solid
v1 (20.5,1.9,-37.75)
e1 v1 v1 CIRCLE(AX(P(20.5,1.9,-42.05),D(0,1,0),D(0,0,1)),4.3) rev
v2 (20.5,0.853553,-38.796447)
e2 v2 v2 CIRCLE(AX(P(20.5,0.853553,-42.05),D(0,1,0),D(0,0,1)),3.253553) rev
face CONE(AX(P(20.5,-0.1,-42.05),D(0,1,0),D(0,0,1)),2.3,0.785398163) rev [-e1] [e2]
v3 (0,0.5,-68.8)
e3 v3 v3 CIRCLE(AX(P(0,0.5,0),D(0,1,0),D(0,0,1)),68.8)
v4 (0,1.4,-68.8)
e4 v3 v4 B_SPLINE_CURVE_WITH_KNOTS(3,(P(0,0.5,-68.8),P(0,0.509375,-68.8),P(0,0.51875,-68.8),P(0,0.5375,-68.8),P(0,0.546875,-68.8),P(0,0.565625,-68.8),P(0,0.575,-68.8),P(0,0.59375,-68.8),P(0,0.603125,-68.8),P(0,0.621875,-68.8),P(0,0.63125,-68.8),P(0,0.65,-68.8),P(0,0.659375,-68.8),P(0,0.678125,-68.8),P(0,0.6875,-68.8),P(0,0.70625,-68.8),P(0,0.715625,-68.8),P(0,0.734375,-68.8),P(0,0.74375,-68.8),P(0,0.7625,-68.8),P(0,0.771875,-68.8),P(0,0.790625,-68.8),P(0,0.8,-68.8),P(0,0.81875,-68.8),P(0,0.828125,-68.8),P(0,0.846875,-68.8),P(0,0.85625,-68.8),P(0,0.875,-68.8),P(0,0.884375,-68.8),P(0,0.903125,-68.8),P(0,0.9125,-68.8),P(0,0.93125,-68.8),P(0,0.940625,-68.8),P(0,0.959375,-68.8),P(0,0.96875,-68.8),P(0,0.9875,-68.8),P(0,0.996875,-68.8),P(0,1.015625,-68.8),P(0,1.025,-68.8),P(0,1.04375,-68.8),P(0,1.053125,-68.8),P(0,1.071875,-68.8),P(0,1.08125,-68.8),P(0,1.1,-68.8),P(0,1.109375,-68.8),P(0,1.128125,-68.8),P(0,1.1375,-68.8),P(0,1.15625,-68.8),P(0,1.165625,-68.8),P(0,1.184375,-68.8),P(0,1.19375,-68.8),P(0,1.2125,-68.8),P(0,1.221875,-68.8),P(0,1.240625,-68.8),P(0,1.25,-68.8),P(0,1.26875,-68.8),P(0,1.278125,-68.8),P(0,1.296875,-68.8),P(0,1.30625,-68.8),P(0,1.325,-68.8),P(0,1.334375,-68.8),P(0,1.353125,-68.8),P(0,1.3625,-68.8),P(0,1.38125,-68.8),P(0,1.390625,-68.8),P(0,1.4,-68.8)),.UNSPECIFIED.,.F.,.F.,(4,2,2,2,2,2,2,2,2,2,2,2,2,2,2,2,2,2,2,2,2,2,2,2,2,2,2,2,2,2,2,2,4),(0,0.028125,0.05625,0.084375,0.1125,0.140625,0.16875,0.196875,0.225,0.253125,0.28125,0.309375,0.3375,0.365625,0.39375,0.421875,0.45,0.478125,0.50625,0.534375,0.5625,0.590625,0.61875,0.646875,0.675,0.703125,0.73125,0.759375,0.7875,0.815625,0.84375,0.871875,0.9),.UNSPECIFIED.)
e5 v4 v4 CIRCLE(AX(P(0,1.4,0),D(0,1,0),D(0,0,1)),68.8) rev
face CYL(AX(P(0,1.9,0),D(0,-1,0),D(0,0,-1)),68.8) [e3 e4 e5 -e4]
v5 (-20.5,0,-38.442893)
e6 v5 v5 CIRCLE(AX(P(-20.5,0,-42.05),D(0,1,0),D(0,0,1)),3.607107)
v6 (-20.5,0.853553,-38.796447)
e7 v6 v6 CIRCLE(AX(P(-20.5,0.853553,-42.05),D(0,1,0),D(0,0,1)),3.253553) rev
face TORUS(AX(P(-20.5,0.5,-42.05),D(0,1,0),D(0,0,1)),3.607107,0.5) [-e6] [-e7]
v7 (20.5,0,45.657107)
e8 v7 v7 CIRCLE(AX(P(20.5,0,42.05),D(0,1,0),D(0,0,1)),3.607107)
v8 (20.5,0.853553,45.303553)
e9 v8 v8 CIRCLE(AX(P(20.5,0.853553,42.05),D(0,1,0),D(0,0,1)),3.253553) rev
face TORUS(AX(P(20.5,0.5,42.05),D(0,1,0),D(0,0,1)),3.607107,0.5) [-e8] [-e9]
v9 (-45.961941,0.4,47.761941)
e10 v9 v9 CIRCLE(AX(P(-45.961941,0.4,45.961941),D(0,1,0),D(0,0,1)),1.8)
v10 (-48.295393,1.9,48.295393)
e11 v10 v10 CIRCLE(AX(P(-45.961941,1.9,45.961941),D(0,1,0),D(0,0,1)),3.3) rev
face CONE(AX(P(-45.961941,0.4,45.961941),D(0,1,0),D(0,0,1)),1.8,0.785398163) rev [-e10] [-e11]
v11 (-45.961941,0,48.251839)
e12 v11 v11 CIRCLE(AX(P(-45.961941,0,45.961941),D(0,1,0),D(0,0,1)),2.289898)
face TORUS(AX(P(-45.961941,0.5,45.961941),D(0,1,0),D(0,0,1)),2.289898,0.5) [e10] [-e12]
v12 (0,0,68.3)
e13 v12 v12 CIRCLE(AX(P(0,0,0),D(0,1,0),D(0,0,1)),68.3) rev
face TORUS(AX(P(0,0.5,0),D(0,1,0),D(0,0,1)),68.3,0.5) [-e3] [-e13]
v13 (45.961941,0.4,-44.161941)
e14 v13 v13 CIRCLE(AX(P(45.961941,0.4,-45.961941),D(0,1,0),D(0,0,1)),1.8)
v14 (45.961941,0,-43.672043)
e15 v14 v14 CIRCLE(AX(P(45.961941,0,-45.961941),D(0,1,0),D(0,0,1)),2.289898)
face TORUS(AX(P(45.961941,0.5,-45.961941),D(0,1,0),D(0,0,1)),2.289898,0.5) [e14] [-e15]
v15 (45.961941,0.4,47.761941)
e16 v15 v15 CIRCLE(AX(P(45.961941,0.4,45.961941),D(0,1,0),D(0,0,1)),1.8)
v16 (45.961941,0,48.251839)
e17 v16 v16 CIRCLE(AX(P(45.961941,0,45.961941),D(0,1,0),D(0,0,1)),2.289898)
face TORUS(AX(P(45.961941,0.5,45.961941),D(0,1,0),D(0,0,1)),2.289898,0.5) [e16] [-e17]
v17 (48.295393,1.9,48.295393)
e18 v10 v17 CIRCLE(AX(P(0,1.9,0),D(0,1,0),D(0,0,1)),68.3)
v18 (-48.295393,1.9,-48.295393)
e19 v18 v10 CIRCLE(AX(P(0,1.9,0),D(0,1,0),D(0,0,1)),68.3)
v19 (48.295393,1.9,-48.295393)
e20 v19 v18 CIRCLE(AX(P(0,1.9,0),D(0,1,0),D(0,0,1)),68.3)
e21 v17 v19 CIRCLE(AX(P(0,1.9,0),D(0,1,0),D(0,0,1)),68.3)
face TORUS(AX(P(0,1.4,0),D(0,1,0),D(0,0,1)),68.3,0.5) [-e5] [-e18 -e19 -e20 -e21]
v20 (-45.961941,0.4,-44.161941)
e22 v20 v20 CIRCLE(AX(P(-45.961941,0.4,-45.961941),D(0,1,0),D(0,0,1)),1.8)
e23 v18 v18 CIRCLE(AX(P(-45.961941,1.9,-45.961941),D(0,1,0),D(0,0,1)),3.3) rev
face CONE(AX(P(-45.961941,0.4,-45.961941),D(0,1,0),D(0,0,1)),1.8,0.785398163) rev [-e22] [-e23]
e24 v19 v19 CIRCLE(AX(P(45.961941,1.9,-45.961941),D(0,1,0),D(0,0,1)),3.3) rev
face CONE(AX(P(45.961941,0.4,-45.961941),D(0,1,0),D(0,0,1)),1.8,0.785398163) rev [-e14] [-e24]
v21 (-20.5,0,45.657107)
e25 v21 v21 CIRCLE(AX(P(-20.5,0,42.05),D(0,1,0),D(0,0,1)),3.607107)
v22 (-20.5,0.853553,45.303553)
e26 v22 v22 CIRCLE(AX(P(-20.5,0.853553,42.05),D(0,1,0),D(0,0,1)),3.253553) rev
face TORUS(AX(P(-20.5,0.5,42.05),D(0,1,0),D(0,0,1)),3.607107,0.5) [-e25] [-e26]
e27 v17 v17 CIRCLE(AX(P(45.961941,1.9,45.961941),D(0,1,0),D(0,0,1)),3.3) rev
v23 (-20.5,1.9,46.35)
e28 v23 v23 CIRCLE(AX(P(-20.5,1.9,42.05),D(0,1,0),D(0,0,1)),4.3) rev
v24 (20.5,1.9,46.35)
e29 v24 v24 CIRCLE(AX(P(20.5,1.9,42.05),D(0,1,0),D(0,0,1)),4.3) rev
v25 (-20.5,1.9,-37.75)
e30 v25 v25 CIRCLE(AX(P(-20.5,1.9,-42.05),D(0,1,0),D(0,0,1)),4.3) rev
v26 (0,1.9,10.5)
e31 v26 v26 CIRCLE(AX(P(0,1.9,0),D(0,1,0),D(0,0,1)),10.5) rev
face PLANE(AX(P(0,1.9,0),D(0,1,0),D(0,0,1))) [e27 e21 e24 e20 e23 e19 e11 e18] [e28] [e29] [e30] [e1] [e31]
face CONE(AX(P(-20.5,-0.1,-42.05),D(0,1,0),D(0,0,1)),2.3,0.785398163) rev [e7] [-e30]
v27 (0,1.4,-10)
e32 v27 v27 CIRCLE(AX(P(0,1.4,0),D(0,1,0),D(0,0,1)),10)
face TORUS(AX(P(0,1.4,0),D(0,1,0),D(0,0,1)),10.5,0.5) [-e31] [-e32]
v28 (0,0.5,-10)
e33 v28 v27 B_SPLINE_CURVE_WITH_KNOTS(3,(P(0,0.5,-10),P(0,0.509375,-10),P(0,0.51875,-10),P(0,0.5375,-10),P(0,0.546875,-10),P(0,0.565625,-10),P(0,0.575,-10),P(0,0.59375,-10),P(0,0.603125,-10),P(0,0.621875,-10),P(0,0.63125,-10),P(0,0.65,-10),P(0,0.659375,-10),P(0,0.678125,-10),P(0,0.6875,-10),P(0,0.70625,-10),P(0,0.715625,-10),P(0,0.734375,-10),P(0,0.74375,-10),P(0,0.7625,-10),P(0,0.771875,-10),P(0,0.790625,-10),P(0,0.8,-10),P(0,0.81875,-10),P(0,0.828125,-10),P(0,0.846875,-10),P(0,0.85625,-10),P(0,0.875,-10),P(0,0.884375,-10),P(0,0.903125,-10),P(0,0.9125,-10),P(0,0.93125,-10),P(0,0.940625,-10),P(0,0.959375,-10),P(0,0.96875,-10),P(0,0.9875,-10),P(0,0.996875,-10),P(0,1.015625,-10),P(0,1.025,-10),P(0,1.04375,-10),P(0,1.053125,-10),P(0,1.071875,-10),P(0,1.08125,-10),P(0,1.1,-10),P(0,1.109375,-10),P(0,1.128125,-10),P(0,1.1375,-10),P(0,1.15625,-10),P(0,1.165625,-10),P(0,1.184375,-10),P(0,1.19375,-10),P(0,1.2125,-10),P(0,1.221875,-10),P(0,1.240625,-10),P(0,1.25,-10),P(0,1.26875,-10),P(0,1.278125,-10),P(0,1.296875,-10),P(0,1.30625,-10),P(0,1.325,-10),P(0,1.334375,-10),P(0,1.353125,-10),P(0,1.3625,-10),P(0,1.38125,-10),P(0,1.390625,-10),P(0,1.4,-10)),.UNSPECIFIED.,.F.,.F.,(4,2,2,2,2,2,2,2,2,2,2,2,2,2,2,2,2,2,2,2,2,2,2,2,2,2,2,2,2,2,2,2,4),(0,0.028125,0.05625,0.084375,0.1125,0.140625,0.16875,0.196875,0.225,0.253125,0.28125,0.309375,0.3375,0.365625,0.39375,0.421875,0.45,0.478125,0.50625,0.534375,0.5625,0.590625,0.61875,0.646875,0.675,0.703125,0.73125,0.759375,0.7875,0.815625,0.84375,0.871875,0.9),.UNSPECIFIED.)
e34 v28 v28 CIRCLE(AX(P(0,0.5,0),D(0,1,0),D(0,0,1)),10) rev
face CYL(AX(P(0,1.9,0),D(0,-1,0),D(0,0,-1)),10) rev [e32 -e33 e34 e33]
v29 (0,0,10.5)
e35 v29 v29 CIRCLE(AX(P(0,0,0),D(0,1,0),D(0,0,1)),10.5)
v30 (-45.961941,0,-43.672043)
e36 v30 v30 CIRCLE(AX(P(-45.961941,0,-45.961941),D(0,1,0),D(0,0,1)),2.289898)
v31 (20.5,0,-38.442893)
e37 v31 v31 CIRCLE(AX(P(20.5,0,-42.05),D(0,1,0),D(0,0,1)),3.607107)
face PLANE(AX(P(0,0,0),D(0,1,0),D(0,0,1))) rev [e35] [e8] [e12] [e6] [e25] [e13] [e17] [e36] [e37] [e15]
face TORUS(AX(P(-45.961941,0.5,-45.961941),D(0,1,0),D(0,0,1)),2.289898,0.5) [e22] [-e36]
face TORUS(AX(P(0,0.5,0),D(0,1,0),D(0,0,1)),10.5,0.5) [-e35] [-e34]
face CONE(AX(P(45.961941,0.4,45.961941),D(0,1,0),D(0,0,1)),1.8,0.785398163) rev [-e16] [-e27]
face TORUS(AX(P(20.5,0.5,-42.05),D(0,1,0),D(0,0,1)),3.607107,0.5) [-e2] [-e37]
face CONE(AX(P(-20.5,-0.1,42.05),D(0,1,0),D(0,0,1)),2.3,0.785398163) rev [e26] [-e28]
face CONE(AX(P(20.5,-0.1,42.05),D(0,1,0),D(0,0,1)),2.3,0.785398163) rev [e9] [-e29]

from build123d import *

# Parameters (mm, degrees)
SKETCH1_R           = 68.8
SKETCH1_R_2         = 2.3
SKETCH1_R_3         = 10
SKETCH1_R_4         = 1.8
BOSS_EXTRUDE1_DEPTH = 1.9
CHAMFER1_SIZE       = 2
CHAMFER3_SIZE       = 1.5
FILLET2_R           = 0.5


with BuildPart() as part:
    # Sketch1 → Boss-Extrude1 (new body)
    with BuildSketch(Plane(origin=(0, 0, 0), x_dir=(1, 0, 0), z_dir=(0, 1, 0))):
        with Locations(Location((0, 0, 0), (0, 0, 90))):
            Circle(SKETCH1_R)
        with Locations(Location((-20.5, 42.05, 0), (0, 0, 90))):
            Circle(SKETCH1_R_2, mode=Mode.SUBTRACT)
        with Locations(Location((20.5, 42.05, 0), (0, 0, 90))):
            Circle(SKETCH1_R_2, mode=Mode.SUBTRACT)
        with Locations(Location((20.5, -42.05, 0), (0, 0, 90))):
            Circle(SKETCH1_R_2, mode=Mode.SUBTRACT)
        with Locations(Location((-20.5, -42.05, 0), (0, 0, 90))):
            Circle(SKETCH1_R_2, mode=Mode.SUBTRACT)
        with Locations(Location((0, 0, 0), (0, 0, 90))):
            Circle(SKETCH1_R_3, mode=Mode.SUBTRACT)
        with Locations(Location((-45.961940777, 45.961940777, 0), (0, 0, 90))):
            Circle(SKETCH1_R_4, mode=Mode.SUBTRACT)
        with Locations(Location((45.961940777, 45.961940777, 0), (0, 0, 90))):
            Circle(SKETCH1_R_4, mode=Mode.SUBTRACT)
        with Locations(Location((45.961940777, -45.961940777, 0), (0, 0, 90))):
            Circle(SKETCH1_R_4, mode=Mode.SUBTRACT)
        with Locations(Location((-45.961940777, -45.961940777, 0), (0, 0, 90))):
            Circle(SKETCH1_R_4, mode=Mode.SUBTRACT)
    extrude(amount=BOSS_EXTRUDE1_DEPTH)

    # Chamfer1
    # the kernel refuses this chamfer: 2 mm, written as the material it takes off along each edge
    with BuildSketch(Plane(origin=(-20.5, 1.9, -42.05), x_dir=(0, 0, -1), z_dir=(1, 0, 0))) as chamfer1_piece_1:
        Polygon((2.3, -CHAMFER1_SIZE), (2.3 + CHAMFER1_SIZE, 0), (2.3, 0), align=None)
    revolve(axis=Axis((-20.5, 1.9, -42.05), (0, 1, 0)), mode=Mode.SUBTRACT)
    with BuildSketch(Plane(origin=(20.5, 1.9, -42.05), x_dir=(0, 0, -1), z_dir=(1, 0, 0))) as chamfer1_piece_2:
        Polygon((2.3, -CHAMFER1_SIZE), (2.3 + CHAMFER1_SIZE, 0), (2.3, 0), align=None)
    revolve(axis=Axis((20.5, 1.9, -42.05), (0, 1, 0)), mode=Mode.SUBTRACT)
    with BuildSketch(Plane(origin=(20.5, 1.9, 42.05), x_dir=(0, 0, -1), z_dir=(1, 0, 0))) as chamfer1_piece_3:
        Polygon((2.3, -CHAMFER1_SIZE), (2.3 + CHAMFER1_SIZE, 0), (2.3, 0), align=None)
    revolve(axis=Axis((20.5, 1.9, 42.05), (0, 1, 0)), mode=Mode.SUBTRACT)
    with BuildSketch(Plane(origin=(-20.5, 1.9, 42.05), x_dir=(0, 0, -1), z_dir=(1, 0, 0))) as chamfer1_piece_4:
        Polygon((2.3, -CHAMFER1_SIZE), (2.3 + CHAMFER1_SIZE, 0), (2.3, 0), align=None)
    revolve(axis=Axis((-20.5, 1.9, 42.05), (0, 1, 0)), mode=Mode.SUBTRACT)

    # Chamfer3
    chamfer3_edges = [part.edges().sort_by_distance(p)[0] for p in [
        (-45.961940777, 1.9, 47.761940777),
        (45.961940777, 1.9, 47.761940777),
        (45.961940777, 1.9, -44.161940777),
        (-45.961940777, 1.9, -44.161940777),
    ]]
    chamfer(chamfer3_edges, length=CHAMFER3_SIZE)

    # Fillet2
    # the kernel refuses this fillet: 0.5 mm, written as the material it takes off along each edge
    with BuildSketch(Plane(origin=(0, 0, 0), x_dir=(0, 0, -1), z_dir=(1, 0, 0))) as fillet2_piece_1:
        with BuildLine():
            CenterArc((68.8 - FILLET2_R, FILLET2_R), FILLET2_R, 270, 90)
            Line((68.8 - FILLET2_R, 0), (68.8 - FILLET2_R, -FILLET2_R * 0.02))
            Line((68.8 - FILLET2_R, -FILLET2_R * 0.02), (68.8 + FILLET2_R * 0.02, -FILLET2_R * 0.02))
            Line((68.8 + FILLET2_R * 0.02, -FILLET2_R * 0.02), (68.8 + FILLET2_R * 0.02, FILLET2_R))
            Line((68.8 + FILLET2_R * 0.02, FILLET2_R), (68.8, FILLET2_R))
        make_face()
    revolve(axis=Axis((0, 0, 0), (0, 1, 0)), mode=Mode.SUBTRACT)
    with BuildSketch(Plane(origin=(0, 0, 0), x_dir=(0, 0, -1), z_dir=(1, 0, 0))) as fillet2_piece_2:
        with BuildLine():
            CenterArc((10 + FILLET2_R, FILLET2_R), FILLET2_R, 180, 90)
            Line((10 + FILLET2_R, 0), (10 + FILLET2_R, -FILLET2_R * 0.02))
            Line((10 + FILLET2_R, -FILLET2_R * 0.02), (10 - FILLET2_R * 0.02, -FILLET2_R * 0.02))
            Line((10 - FILLET2_R * 0.02, -FILLET2_R * 0.02), (10 - FILLET2_R * 0.02, FILLET2_R))
            Line((10 - FILLET2_R * 0.02, FILLET2_R), (10, FILLET2_R))
        make_face()
    revolve(axis=Axis((0, 0, 0), (0, 1, 0)), mode=Mode.SUBTRACT)
    with BuildSketch(Plane(origin=(-45.961940777, 0, -45.961940777), x_dir=(0, 0, -1), z_dir=(1, 0, 0))) as fillet2_piece_3:
        with BuildLine():
            CenterArc((2.289897949, 0.5), FILLET2_R, 191.536959033, 78.463040967)
            Line((1.8, 0.4), (1.790202041, 0.398))
            ThreePointArc((1.790202041, 0.398), (1.79, 0.2), (1.79, 0))
            Line((1.79, 0), (1.8, -0.01))
            Line((1.8, -0.01), (2.289897949, -0.01))
            Line((2.289897949, -0.01), (2.289897949, 0))
        make_face()
    revolve(axis=Axis((-45.961940777, 0, -45.961940777), (0, 1, 0)), mode=Mode.SUBTRACT)
    with BuildSketch(Plane(origin=(45.961940777, 0, -45.961940777), x_dir=(0, 0, -1), z_dir=(1, 0, 0))) as fillet2_piece_4:
        with BuildLine():
            CenterArc((2.289897949, 0.5), FILLET2_R, 191.536959033, 78.463040967)
            Line((1.8, 0.4), (1.790202041, 0.398))
            ThreePointArc((1.790202041, 0.398), (1.79, 0.2), (1.79, 0))
            Line((1.79, 0), (1.8, -0.01))
            Line((1.8, -0.01), (2.289897949, -0.01))
            Line((2.289897949, -0.01), (2.289897949, 0))
        make_face()
    revolve(axis=Axis((45.961940777, 0, -45.961940777), (0, 1, 0)), mode=Mode.SUBTRACT)
    with BuildSketch(Plane(origin=(45.961940777, 0, 45.961940777), x_dir=(0, 0, -1), z_dir=(1, 0, 0))) as fillet2_piece_5:
        with BuildLine():
            CenterArc((2.289897949, 0.5), FILLET2_R, 191.536959033, 78.463040967)
            Line((1.8, 0.4), (1.790202041, 0.398))
            ThreePointArc((1.790202041, 0.398), (1.79, 0.2), (1.79, 0))
            Line((1.79, 0), (1.8, -0.01))
            Line((1.8, -0.01), (2.289897949, -0.01))
            Line((2.289897949, -0.01), (2.289897949, 0))
        make_face()
    revolve(axis=Axis((45.961940777, 0, 45.961940777), (0, 1, 0)), mode=Mode.SUBTRACT)
    with BuildSketch(Plane(origin=(-45.961940777, 0, 45.961940777), x_dir=(0, 0, -1), z_dir=(1, 0, 0))) as fillet2_piece_6:
        with BuildLine():
            CenterArc((2.289897949, 0.5), FILLET2_R, 191.536959033, 78.463040967)
            Line((2.289897949, 0), (2.289897949, -0.01))
            Line((2.289897949, -0.01), (1.8, -0.01))
            Line((1.8, -0.01), (1.79, 0))
            ThreePointArc((1.79, 0), (1.79, 0.2), (1.790202041, 0.398))
            Line((1.790202041, 0.398), (1.8, 0.4))
        make_face()
    revolve(axis=Axis((-45.961940777, 0, 45.961940777), (0, 1, 0)), mode=Mode.SUBTRACT)
    with BuildSketch(Plane(origin=(-20.5, 0, 42.05), x_dir=(0, 0, -1), z_dir=(1, 0, 0))) as fillet2_piece_7:
        with BuildLine():
            CenterArc((2.4 + FILLET2_R * 2.41421356237, FILLET2_R), FILLET2_R, 135, 135)
            Line((2.4 + FILLET2_R * 2.41421356237, 0), (2.4 + FILLET2_R * 2.41421356237, -FILLET2_R * 0.02))
            Line((2.4 + FILLET2_R * 2.41421356237, -FILLET2_R * 0.02), (2.4, -FILLET2_R * 0.02))
            Line((2.4, -FILLET2_R * 0.02), (2.4 - FILLET2_R * 0.0141421356237, FILLET2_R * 0.0141421356237))
            Line((2.4 - FILLET2_R * 0.0141421356237, FILLET2_R * 0.0141421356237), (2.4 + FILLET2_R * 1.69296464556, FILLET2_R * 1.72124891681))
            Line((2.4 + FILLET2_R * 1.69296464556, FILLET2_R * 1.72124891681), (2.4 + FILLET2_R * 1.70710678119, FILLET2_R * 1.70710678119))
        make_face()
    revolve(axis=Axis((-20.5, 0, 42.05), (0, 1, 0)), mode=Mode.SUBTRACT)
    with BuildSketch(Plane(origin=(20.5, 0, 42.05), x_dir=(0, 0, -1), z_dir=(1, 0, 0))) as fillet2_piece_8:
        with BuildLine():
            CenterArc((2.4 + FILLET2_R * 2.41421356237, FILLET2_R), FILLET2_R, 135, 135)
            Line((2.4 + FILLET2_R * 2.41421356237, 0), (2.4 + FILLET2_R * 2.41421356237, -FILLET2_R * 0.02))
            Line((2.4 + FILLET2_R * 2.41421356237, -FILLET2_R * 0.02), (2.4, -FILLET2_R * 0.02))
            Line((2.4, -FILLET2_R * 0.02), (2.4 - FILLET2_R * 0.0141421356237, FILLET2_R * 0.0141421356237))
            Line((2.4 - FILLET2_R * 0.0141421356237, FILLET2_R * 0.0141421356237), (2.4 + FILLET2_R * 1.69296464556, FILLET2_R * 1.72124891681))
            Line((2.4 + FILLET2_R * 1.69296464556, FILLET2_R * 1.72124891681), (2.4 + FILLET2_R * 1.70710678119, FILLET2_R * 1.70710678119))
        make_face()
    revolve(axis=Axis((20.5, 0, 42.05), (0, 1, 0)), mode=Mode.SUBTRACT)
    with BuildSketch(Plane(origin=(20.5, 0, -42.05), x_dir=(0, 0, -1), z_dir=(1, 0, 0))) as fillet2_piece_9:
        with BuildLine():
            CenterArc((2.4 + FILLET2_R * 2.41421356237, FILLET2_R), FILLET2_R, 135, 135)
            Line((2.4 + FILLET2_R * 2.41421356237, 0), (2.4 + FILLET2_R * 2.41421356237, -FILLET2_R * 0.02))
            Line((2.4 + FILLET2_R * 2.41421356237, -FILLET2_R * 0.02), (2.4, -FILLET2_R * 0.02))
            Line((2.4, -FILLET2_R * 0.02), (2.4 - FILLET2_R * 0.0141421356237, FILLET2_R * 0.0141421356237))
            Line((2.4 - FILLET2_R * 0.0141421356237, FILLET2_R * 0.0141421356237), (2.4 + FILLET2_R * 1.69296464556, FILLET2_R * 1.72124891681))
            Line((2.4 + FILLET2_R * 1.69296464556, FILLET2_R * 1.72124891681), (2.4 + FILLET2_R * 1.70710678119, FILLET2_R * 1.70710678119))
        make_face()
    revolve(axis=Axis((20.5, 0, -42.05), (0, 1, 0)), mode=Mode.SUBTRACT)
    with BuildSketch(Plane(origin=(-20.5, 0, -42.05), x_dir=(0, 0, -1), z_dir=(1, 0, 0))) as fillet2_piece_10:
        with BuildLine():
            CenterArc((2.4 + FILLET2_R * 2.41421356237, FILLET2_R), FILLET2_R, 135, 135)
            Line((2.4 + FILLET2_R * 2.41421356237, 0), (2.4 + FILLET2_R * 2.41421356237, -FILLET2_R * 0.02))
            Line((2.4 + FILLET2_R * 2.41421356237, -FILLET2_R * 0.02), (2.4, -FILLET2_R * 0.02))
            Line((2.4, -FILLET2_R * 0.02), (2.4 - FILLET2_R * 0.0141421356237, FILLET2_R * 0.0141421356237))
            Line((2.4 - FILLET2_R * 0.0141421356237, FILLET2_R * 0.0141421356237), (2.4 + FILLET2_R * 1.69296464556, FILLET2_R * 1.72124891681))
            Line((2.4 + FILLET2_R * 1.69296464556, FILLET2_R * 1.72124891681), (2.4 + FILLET2_R * 1.70710678119, FILLET2_R * 1.70710678119))
        make_face()
    revolve(axis=Axis((-20.5, 0, -42.05), (0, 1, 0)), mode=Mode.SUBTRACT)
    with BuildSketch(Plane(origin=(0, 1.9, 0), x_dir=(0, 0, -1), z_dir=(1, 0, 0))) as fillet2_piece_11:
        with BuildLine():
            CenterArc((10 + FILLET2_R, -FILLET2_R), FILLET2_R, 90, 90)
            Line((10, -FILLET2_R), (10 - FILLET2_R * 0.02, -FILLET2_R))
            Line((10 - FILLET2_R * 0.02, -FILLET2_R), (10 - FILLET2_R * 0.02, FILLET2_R * 0.02))
            Line((10 - FILLET2_R * 0.02, FILLET2_R * 0.02), (10 + FILLET2_R, FILLET2_R * 0.02))
            Line((10 + FILLET2_R, FILLET2_R * 0.02), (10 + FILLET2_R, 0))
        make_face()
    revolve(axis=Axis((0, 1.9, 0), (0, 1, 0)), mode=Mode.SUBTRACT)
    with BuildSketch(Plane(origin=(0, 1.9, 0), x_dir=(0, 0, -1), z_dir=(1, 0, 0))) as fillet2_piece_12:
        with BuildLine():
            CenterArc((68.8 - FILLET2_R, -FILLET2_R), FILLET2_R, 0, 90)
            Line((68.8, -FILLET2_R), (68.8 + FILLET2_R * 0.02, -FILLET2_R))
            Line((68.8 + FILLET2_R * 0.02, -FILLET2_R), (68.8 + FILLET2_R * 0.02, FILLET2_R * 0.02))
            Line((68.8 + FILLET2_R * 0.02, FILLET2_R * 0.02), (68.8 - FILLET2_R, FILLET2_R * 0.02))
            Line((68.8 - FILLET2_R, FILLET2_R * 0.02), (68.8 - FILLET2_R, 0))
        make_face()
    revolve(axis=Axis((0, 1.9, 0), (0, 1, 0)), mode=Mode.SUBTRACT)


solid = part.part
